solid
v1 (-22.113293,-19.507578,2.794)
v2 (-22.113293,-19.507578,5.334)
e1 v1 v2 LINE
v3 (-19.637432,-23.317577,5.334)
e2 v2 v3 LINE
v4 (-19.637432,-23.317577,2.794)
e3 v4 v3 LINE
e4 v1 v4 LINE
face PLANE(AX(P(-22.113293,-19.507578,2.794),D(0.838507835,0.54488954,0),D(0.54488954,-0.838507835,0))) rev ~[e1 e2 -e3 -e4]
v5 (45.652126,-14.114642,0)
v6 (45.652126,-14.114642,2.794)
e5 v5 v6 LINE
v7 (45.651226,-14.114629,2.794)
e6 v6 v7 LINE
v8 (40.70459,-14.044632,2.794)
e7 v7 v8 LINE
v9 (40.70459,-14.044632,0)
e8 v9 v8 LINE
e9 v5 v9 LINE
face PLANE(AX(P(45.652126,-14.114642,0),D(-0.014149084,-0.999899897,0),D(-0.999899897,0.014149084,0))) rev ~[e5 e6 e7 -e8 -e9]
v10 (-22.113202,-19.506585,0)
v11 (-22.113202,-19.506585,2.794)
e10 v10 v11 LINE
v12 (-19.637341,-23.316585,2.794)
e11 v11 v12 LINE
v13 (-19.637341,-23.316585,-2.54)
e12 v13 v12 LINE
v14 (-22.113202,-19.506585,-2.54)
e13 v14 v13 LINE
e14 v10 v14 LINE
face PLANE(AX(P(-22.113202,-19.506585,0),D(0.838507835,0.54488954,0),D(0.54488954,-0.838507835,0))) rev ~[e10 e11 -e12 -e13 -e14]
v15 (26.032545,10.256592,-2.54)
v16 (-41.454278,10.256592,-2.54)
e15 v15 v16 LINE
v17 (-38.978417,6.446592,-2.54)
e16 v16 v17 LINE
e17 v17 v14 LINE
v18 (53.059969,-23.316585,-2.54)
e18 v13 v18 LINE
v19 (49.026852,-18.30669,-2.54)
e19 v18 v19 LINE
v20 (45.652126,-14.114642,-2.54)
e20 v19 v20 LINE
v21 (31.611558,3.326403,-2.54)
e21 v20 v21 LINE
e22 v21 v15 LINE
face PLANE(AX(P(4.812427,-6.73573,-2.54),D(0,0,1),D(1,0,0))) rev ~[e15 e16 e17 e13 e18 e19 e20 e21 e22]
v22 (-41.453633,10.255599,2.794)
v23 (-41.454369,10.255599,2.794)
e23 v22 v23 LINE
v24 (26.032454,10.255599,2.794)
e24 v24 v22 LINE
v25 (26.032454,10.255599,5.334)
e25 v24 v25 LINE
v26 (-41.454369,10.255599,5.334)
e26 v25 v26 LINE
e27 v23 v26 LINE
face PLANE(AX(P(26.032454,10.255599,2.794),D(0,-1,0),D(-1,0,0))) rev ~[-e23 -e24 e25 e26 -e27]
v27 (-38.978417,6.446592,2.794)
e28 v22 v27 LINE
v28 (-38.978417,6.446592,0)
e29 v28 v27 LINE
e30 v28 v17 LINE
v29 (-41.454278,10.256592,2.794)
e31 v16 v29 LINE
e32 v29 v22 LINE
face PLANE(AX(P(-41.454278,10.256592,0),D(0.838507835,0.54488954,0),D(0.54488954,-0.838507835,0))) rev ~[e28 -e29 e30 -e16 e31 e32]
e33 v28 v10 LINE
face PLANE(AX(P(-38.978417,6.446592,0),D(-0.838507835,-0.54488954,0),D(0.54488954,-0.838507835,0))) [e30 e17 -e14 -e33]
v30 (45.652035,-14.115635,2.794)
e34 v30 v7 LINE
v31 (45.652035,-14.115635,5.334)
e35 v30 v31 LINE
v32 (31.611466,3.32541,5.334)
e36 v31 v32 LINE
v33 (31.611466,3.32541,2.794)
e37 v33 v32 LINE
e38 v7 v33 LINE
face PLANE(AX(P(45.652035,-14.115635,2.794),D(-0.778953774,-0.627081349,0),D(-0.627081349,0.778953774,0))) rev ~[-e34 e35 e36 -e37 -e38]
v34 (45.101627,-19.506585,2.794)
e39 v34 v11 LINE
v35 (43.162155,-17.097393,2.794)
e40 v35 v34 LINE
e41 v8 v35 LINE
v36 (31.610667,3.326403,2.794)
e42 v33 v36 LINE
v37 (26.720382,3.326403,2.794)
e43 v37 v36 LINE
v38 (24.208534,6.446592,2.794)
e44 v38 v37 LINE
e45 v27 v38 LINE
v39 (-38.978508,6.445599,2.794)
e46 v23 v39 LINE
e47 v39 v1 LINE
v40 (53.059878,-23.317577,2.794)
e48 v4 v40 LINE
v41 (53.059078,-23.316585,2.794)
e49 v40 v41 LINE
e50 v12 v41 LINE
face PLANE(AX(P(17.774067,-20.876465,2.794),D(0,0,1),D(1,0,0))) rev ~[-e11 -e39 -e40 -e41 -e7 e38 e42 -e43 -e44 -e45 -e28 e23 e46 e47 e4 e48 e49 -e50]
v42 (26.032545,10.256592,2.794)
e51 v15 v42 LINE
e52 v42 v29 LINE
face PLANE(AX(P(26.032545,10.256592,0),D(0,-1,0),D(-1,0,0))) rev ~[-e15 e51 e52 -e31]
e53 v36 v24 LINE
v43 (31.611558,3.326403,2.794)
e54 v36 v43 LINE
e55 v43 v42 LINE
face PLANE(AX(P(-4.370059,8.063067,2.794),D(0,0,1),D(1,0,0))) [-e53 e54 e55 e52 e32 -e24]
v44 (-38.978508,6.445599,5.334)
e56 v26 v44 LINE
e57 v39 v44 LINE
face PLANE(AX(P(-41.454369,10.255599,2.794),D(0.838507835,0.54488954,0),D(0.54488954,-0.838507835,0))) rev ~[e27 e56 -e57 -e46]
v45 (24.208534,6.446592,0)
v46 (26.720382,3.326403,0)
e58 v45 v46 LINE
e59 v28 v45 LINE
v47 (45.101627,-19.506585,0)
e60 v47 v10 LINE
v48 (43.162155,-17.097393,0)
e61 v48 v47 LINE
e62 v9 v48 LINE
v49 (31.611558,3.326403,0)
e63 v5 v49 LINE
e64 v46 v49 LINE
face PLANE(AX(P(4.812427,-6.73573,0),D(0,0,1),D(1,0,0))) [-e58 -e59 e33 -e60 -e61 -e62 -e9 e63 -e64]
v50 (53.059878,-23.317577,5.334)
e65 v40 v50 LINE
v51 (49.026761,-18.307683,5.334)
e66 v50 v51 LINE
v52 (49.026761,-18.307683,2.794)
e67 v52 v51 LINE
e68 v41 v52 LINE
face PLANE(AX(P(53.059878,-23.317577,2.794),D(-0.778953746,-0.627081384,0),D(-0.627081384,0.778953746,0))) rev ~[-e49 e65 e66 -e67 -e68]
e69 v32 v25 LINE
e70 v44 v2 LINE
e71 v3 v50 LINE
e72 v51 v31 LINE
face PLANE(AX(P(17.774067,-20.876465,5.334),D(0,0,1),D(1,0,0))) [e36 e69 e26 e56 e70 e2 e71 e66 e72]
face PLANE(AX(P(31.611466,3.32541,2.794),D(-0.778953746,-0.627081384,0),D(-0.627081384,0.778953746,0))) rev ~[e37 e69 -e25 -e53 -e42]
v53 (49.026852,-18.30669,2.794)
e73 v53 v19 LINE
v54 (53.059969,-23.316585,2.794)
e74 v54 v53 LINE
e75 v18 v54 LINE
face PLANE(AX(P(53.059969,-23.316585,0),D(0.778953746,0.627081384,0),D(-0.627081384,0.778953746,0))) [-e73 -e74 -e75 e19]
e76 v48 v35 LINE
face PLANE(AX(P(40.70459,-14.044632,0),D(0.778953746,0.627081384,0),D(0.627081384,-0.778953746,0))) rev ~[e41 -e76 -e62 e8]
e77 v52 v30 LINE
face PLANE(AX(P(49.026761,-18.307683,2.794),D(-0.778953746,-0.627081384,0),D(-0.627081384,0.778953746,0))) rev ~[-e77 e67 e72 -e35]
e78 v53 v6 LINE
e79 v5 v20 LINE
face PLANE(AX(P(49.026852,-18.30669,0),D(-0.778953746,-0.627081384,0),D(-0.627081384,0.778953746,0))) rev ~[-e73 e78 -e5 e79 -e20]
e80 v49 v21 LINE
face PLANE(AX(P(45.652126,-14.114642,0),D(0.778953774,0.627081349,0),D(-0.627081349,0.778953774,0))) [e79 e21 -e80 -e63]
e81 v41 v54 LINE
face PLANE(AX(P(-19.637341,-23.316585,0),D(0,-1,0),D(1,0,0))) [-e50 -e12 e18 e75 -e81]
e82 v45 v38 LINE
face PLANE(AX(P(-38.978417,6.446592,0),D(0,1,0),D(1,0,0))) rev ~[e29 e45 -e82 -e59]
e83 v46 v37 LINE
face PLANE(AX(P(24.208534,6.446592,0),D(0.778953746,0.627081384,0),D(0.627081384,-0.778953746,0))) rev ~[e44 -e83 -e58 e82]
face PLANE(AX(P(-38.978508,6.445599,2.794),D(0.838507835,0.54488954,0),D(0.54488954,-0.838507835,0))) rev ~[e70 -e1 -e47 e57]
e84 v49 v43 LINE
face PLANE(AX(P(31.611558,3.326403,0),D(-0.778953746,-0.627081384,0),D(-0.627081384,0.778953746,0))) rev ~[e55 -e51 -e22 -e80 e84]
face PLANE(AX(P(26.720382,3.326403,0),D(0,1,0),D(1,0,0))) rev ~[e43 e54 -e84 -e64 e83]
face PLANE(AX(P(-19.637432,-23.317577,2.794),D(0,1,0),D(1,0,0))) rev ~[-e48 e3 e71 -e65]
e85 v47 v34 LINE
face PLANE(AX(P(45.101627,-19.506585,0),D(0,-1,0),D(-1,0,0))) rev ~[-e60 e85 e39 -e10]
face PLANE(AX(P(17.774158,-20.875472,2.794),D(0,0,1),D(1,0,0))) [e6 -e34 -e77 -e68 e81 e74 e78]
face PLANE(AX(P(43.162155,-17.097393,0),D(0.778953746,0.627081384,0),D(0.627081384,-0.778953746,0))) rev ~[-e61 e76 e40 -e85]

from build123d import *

# Parameters (mm, degrees)
F1_DEPTH = 2.54
F2_DEPTH = 2.794
F5_DEPTH = 2.54


# Not quite as in the source:
# - ends of sketch curves that miss each other by under 0.0002 mm in the source are joined


with BuildPart() as f1:
    # F0 (on Top) → F1 (new body)
    with BuildSketch(Plane.XY):
        Polygon((40.704589831, -14.0446320264), (45.6521262704, -14.1146421426), (31.6115576886, 3.3264026483), (26.7203815156, 3.3264026483), (24.2085343305, 6.4465921843), (-38.9784165732, 6.4465921843), (-22.1132018277, -19.5065848529), (45.1016274707, -19.5065848529), (43.1621550999, -17.0973931503), align=None)
        Polygon((26.7203815156, 3.3264026483), (31.6115576886, 3.3264026483), (26.0325449788, 10.2565921843), (-41.4542779326, 10.2565921843), (-38.9784165732, 6.4465921843), (24.2085343305, 6.4465921843), align=None)
        Polygon((53.0599689064, -23.3165845275), (49.0268522152, -18.3066903858), (45.6521262704, -14.1146421426), (40.704589831, -14.0446320264), (43.1621550999, -17.0973931503), (45.1016274707, -19.5065848529), (-22.1132018277, -19.5065848529), (-19.6373406798, -23.3165845275), align=None)
    extrude(amount=-F1_DEPTH)

    # F0 (on Top) → F2 (join)
    with BuildSketch(Plane.XY):
        Polygon((26.7203815156, 3.3264026483), (31.6115576886, 3.3264026483), (26.0325449788, 10.2565921843), (-41.4542779326, 10.2565921843), (-38.9784165732, 6.4465921843), (24.2085343305, 6.4465921843), align=None)
        Polygon((53.0599689064, -23.3165845275), (49.0268522152, -18.3066903858), (45.6521262704, -14.1146421426), (40.704589831, -14.0446320264), (43.1621550999, -17.0973931503), (45.1016274707, -19.5065848529), (-22.1132018277, -19.5065848529), (-19.6373406798, -23.3165845275), align=None)
    extrude(amount=F2_DEPTH)

    # F4 (on offset) → F5 (join)
    with BuildSketch(Plane.XY.offset(2.794)):
        Polygon((53.0598776368, -23.3175773174), (49.0267609456, -18.3076831757), (45.6520350008, -14.1156349324), (40.7044985614, -14.0456248163), (43.1620638303, -17.0983859402), (45.101536201, -19.5075776428), (-22.1132930973, -19.5075776428), (-19.6374319494, -23.3175773174), align=None)
        Polygon((40.7044985614, -14.0456248163), (45.6520350008, -14.1156349324), (31.611466419, 3.3254098585), (26.720290246, 3.3254098585), (24.2084430609, 6.4455993944), (-38.9785078428, 6.4455993944), (-22.1132930973, -19.5075776428), (45.101536201, -19.5075776428), (43.1620638303, -17.0983859402), align=None)
        Polygon((26.720290246, 3.3254098585), (31.611466419, 3.3254098585), (26.0324537092, 10.2555993944), (-41.4543692023, 10.2555993944), (-38.9785078428, 6.4455993944), (24.2084430609, 6.4455993944), align=None)
    extrude(amount=F5_DEPTH)


solid = f1.part
